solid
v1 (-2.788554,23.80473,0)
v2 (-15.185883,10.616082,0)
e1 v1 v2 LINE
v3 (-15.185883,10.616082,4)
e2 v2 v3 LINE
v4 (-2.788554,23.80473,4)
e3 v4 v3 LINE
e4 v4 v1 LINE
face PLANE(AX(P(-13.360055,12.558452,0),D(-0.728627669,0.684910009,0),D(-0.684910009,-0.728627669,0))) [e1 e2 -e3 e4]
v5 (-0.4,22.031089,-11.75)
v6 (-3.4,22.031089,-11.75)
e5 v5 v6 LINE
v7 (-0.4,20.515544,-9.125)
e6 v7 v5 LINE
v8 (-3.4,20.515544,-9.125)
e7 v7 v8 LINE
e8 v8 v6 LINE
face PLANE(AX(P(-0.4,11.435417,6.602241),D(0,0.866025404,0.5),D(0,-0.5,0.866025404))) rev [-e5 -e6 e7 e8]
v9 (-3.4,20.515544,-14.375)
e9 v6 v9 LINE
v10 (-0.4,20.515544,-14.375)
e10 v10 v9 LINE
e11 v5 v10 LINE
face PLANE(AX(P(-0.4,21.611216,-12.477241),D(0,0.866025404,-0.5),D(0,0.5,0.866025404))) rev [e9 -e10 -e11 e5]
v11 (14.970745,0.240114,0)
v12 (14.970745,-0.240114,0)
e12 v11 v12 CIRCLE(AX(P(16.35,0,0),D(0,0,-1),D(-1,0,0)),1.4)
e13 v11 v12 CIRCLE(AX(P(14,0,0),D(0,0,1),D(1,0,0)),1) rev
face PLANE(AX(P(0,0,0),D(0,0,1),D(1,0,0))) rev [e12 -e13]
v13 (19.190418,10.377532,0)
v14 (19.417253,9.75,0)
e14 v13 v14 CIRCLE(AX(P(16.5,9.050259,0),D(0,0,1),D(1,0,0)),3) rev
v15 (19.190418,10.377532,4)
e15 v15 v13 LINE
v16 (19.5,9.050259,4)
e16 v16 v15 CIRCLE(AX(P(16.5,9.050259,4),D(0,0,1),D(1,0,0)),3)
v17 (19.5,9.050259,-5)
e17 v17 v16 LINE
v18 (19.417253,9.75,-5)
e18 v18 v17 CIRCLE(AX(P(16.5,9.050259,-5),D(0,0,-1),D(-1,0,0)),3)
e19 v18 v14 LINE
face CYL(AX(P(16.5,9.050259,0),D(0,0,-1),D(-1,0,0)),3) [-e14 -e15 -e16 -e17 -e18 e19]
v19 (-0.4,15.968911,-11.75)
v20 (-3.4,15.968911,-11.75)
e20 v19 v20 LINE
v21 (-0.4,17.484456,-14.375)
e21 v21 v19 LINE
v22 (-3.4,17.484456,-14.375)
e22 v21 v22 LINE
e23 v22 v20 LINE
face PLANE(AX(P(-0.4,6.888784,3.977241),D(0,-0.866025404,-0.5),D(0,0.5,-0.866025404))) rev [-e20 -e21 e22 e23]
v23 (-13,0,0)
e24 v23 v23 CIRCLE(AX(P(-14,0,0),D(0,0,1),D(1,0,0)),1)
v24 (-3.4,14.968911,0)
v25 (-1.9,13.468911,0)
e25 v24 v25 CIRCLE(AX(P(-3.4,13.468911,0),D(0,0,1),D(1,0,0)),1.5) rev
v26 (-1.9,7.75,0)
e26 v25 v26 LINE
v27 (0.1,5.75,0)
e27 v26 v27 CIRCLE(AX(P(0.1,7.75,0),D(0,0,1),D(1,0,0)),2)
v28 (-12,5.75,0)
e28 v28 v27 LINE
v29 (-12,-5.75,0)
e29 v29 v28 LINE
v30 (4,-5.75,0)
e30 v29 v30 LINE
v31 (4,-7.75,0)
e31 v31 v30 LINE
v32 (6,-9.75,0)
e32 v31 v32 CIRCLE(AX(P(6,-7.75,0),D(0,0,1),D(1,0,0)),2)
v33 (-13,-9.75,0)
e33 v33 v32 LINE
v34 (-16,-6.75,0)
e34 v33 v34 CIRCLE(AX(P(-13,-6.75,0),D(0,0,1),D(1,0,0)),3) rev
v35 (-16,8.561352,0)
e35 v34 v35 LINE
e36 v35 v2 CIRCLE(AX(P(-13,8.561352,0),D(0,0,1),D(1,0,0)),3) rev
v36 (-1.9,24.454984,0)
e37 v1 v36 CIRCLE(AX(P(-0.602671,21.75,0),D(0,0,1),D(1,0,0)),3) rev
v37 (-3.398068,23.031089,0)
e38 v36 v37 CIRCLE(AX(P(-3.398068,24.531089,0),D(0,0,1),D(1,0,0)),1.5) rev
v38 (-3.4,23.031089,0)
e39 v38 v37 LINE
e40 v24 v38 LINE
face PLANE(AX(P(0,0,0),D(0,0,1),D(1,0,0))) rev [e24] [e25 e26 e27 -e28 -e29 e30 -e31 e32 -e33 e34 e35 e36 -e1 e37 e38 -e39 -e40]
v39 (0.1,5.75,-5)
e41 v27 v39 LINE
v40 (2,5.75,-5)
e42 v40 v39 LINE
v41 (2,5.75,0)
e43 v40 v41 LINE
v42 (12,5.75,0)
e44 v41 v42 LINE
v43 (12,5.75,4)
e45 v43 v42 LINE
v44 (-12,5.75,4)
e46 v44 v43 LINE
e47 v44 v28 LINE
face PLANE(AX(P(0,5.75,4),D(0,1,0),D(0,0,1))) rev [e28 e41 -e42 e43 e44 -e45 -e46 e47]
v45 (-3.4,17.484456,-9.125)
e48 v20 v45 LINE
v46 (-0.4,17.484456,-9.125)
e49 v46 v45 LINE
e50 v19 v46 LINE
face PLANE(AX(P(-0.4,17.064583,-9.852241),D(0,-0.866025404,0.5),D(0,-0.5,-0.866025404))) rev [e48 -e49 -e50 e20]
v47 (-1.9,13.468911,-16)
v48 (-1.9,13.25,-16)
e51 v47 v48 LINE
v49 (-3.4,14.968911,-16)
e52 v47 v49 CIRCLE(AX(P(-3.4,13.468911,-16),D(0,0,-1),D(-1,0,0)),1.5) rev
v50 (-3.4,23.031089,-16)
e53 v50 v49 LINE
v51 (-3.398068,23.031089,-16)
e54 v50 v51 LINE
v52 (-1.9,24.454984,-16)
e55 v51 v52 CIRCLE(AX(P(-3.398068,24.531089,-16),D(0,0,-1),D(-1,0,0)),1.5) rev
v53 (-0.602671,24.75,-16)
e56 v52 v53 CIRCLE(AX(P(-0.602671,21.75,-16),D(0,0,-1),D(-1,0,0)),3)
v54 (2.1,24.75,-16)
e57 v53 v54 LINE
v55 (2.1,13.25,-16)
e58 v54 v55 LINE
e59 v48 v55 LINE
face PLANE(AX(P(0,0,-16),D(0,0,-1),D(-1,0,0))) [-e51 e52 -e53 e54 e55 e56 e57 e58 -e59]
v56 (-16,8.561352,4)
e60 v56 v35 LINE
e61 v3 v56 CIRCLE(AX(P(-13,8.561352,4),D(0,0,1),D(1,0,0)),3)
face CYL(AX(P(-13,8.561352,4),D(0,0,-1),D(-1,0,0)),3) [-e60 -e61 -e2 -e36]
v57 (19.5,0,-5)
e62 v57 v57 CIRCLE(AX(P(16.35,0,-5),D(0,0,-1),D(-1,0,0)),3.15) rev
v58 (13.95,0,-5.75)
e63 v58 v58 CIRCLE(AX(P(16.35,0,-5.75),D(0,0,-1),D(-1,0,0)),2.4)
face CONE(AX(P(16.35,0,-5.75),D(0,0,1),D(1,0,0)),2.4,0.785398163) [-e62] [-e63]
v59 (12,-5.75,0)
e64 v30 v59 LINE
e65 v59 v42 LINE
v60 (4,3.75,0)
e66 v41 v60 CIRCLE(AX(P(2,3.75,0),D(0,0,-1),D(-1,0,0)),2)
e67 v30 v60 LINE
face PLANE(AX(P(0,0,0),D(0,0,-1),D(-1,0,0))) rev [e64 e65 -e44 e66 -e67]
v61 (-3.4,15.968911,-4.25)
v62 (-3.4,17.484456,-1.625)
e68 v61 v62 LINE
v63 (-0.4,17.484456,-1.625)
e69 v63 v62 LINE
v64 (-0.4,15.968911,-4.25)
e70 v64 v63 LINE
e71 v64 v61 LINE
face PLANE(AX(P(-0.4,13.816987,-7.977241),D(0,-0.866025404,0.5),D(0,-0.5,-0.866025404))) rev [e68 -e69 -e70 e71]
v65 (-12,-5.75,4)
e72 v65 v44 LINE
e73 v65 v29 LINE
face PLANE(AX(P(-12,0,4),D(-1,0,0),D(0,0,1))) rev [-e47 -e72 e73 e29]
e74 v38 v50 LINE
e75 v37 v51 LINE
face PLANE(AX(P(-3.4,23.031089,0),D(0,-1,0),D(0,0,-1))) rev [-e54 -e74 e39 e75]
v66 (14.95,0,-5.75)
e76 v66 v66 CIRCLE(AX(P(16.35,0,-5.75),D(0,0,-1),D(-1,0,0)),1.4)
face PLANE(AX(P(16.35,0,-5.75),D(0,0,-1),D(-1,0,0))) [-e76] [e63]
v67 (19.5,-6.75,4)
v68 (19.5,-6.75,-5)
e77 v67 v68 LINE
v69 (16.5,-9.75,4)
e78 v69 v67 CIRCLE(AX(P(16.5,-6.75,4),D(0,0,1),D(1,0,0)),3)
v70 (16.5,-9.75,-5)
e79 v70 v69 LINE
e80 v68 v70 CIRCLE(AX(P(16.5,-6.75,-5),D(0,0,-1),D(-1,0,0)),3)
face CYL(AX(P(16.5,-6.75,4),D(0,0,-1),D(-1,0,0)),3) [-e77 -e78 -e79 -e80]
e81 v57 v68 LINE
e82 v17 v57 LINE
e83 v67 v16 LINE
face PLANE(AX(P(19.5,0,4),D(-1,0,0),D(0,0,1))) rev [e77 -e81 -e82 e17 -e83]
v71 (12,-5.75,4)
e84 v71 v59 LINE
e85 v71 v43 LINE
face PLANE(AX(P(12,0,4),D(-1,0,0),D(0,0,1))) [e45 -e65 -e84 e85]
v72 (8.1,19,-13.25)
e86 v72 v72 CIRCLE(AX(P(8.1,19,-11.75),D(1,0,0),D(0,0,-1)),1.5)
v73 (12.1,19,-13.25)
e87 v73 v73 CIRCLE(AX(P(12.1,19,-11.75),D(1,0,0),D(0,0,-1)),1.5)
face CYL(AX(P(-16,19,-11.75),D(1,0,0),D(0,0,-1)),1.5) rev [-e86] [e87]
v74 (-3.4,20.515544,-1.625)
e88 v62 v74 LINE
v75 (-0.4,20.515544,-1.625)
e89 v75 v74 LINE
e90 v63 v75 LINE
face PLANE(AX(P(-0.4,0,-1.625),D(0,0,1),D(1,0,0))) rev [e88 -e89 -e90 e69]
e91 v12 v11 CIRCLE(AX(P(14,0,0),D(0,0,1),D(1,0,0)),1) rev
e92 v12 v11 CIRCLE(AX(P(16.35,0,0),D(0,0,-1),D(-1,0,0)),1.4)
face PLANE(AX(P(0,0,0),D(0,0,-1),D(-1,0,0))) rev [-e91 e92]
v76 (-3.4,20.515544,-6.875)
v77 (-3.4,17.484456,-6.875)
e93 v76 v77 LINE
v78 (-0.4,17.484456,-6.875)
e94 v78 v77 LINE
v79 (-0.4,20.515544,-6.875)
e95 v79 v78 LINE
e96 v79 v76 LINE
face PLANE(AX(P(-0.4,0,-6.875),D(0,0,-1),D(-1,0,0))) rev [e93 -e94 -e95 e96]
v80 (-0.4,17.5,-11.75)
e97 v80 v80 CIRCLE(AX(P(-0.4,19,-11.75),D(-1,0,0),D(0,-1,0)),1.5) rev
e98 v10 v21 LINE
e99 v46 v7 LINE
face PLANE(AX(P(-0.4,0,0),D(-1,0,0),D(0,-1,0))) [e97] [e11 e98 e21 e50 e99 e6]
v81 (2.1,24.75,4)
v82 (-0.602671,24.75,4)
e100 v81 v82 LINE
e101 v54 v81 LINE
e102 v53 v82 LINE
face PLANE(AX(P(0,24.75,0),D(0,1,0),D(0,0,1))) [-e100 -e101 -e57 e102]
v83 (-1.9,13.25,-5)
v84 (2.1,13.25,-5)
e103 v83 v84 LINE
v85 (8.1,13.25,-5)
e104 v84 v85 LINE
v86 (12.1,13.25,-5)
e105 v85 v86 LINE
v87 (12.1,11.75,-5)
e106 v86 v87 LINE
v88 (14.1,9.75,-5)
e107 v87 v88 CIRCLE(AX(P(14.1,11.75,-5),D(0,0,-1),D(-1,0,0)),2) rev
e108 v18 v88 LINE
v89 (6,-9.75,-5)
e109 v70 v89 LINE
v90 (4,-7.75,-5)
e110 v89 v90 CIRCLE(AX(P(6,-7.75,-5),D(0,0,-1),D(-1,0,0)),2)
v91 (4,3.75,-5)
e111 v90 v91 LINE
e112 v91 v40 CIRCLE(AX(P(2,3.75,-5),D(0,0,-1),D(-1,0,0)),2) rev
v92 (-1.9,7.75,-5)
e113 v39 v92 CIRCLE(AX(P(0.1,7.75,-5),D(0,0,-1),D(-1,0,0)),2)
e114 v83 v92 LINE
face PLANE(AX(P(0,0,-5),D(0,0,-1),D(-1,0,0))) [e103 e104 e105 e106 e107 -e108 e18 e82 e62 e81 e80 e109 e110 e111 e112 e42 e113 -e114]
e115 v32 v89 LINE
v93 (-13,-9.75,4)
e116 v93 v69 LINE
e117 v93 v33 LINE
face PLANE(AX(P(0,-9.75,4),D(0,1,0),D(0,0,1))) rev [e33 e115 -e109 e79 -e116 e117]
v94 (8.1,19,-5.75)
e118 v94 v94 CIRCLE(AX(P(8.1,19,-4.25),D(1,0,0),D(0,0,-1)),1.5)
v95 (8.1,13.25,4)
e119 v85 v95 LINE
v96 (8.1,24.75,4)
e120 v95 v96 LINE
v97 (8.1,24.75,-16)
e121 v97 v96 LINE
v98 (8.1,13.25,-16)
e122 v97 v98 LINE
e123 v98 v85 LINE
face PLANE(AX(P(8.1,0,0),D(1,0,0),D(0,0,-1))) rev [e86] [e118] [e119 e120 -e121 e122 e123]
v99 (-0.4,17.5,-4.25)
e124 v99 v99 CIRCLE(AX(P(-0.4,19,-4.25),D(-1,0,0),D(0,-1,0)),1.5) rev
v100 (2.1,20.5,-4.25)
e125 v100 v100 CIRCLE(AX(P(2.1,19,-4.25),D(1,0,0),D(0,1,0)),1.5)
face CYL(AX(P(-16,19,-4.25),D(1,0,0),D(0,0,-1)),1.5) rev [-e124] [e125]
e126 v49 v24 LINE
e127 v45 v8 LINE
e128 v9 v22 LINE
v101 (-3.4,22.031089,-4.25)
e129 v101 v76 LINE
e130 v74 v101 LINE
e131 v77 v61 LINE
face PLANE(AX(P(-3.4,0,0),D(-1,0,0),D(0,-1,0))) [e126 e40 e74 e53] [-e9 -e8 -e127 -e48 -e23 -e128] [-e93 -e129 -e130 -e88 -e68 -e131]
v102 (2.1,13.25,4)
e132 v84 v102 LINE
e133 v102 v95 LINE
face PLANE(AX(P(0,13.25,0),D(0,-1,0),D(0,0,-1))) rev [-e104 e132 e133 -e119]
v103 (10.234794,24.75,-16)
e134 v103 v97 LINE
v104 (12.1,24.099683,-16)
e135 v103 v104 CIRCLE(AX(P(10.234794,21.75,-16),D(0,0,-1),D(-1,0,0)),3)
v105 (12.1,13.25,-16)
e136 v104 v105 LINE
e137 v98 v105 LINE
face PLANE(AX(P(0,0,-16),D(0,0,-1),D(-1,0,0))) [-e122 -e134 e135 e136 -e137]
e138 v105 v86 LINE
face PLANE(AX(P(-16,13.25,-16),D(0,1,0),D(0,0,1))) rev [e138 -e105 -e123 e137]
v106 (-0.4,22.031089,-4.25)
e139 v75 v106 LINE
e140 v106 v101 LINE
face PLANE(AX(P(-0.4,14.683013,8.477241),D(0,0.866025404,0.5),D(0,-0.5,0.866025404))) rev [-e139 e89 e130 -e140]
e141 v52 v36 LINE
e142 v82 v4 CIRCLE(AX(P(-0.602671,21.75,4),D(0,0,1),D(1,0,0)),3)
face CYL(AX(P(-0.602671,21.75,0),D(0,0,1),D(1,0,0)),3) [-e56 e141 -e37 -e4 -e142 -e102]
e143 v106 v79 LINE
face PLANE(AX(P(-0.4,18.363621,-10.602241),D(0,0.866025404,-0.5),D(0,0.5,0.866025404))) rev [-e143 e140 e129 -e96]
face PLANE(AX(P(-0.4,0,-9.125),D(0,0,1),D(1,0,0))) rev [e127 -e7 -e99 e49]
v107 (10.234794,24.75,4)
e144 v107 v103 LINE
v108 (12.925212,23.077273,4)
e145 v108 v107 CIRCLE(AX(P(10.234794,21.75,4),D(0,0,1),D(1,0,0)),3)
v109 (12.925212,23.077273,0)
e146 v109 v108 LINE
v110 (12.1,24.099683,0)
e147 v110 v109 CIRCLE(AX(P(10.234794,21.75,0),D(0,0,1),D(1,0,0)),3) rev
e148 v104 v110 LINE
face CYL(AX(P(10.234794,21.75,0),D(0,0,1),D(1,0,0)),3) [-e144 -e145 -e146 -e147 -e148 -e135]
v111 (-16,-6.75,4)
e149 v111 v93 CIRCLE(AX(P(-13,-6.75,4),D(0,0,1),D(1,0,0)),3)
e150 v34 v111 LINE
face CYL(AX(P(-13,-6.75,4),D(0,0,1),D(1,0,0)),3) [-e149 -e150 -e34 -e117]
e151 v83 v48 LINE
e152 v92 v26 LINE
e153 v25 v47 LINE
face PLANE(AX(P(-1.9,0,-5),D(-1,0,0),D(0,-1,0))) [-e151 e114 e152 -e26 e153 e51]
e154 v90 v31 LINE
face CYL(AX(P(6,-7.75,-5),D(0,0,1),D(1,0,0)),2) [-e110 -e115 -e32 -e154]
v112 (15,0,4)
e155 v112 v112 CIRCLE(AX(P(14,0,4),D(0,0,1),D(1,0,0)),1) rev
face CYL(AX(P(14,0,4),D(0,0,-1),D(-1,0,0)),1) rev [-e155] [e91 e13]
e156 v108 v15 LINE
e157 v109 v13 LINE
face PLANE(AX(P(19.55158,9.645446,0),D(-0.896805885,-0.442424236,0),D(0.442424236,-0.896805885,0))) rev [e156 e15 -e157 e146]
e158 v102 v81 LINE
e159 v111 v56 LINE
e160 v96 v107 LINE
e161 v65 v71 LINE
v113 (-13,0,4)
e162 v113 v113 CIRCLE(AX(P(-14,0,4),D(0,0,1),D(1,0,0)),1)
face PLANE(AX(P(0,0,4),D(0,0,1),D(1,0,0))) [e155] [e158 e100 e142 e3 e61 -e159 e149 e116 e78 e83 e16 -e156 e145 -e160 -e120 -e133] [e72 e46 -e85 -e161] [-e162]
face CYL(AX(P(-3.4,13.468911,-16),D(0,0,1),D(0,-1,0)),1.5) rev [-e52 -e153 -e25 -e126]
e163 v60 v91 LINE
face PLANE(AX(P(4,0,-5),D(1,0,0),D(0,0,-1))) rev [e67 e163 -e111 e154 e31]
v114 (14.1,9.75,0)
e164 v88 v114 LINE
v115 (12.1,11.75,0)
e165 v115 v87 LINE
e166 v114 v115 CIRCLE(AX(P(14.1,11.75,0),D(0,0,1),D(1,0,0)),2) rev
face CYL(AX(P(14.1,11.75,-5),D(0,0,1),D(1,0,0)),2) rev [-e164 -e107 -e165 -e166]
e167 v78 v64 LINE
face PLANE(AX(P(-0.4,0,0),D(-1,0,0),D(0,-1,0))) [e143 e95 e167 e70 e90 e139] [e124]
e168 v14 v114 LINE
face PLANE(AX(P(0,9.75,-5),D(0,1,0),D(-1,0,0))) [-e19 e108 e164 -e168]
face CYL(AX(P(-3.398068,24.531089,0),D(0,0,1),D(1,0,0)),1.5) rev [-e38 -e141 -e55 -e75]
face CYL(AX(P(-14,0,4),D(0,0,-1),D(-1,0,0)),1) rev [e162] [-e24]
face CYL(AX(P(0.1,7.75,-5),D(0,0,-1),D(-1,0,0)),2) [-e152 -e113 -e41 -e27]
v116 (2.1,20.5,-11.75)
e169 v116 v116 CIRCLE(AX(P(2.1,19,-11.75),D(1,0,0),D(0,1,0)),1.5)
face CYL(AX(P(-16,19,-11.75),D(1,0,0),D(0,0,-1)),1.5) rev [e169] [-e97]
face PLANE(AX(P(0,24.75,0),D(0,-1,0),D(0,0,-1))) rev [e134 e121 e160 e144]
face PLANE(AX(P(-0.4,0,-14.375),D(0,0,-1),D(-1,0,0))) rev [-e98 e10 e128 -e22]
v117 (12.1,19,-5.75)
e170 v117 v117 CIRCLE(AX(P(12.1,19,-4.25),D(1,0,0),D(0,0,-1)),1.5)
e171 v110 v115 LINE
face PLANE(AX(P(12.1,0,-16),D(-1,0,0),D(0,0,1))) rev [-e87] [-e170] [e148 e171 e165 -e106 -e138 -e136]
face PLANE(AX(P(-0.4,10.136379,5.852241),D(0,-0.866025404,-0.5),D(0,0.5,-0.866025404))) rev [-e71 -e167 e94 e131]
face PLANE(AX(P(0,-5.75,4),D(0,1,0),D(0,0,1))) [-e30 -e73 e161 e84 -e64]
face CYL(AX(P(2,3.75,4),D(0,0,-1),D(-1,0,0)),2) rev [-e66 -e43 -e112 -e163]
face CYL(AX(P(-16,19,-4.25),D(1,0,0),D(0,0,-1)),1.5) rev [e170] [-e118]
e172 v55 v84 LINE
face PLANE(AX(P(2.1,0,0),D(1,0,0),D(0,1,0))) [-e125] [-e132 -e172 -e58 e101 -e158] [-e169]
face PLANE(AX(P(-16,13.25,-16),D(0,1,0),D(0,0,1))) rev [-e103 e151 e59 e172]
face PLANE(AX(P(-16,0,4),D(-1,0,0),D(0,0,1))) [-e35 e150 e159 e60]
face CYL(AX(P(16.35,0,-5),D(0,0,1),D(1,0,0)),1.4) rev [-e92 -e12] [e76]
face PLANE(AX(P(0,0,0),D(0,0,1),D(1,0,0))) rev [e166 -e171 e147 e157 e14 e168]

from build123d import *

# Parameters (mm, degrees)
SKETCH_1_W          = 32
SKETCH_1_H          = 19.5
SKETCH_1_R          = 1
SKETCH_1_W_2        = 24
SKETCH_1_H_2        = 11.5
SKETCH_1_W_3        = 3.5
EXTRUDE_1_DEPTH     = 4
SKETCH_4_W          = 3
SKETCH_4_H          = 3.5
EXTRUDE_3_DEPTH     = 4
FILLET_2_R          = 3
SKETCH_9_R          = 1.4
EXTRUDE_5_DEPTH     = 5
EXTRUDE_START       = 16
EXTRUDE_6_DEPTH     = 16
SKETCH_12_R         = 2.4
SKETCH_12_R_2       = 1.4
EXTRUDE_7_DEPTH     = 0.75
CHAMFER_4_SIZE      = 0.75
SKETCH_11_R         = 1.5
SKETCH_11_W         = 11
SKETCH_11_H         = 3.5
CUT_EXTRUDE_2_DEPTH = 41.720664287
FILLET_7_R          = 2
CUT_EXTRUDE_START   = -1.5
SKETCH_13_R         = 1.5
CUT_EXTRUDE_4_DEPTH = 1.5
SKETCH_15_W         = 16
SKETCH_15_H         = 8.062177826
EXTRUDE_9_DEPTH     = 1.5
FILLET_8_R          = 1.5


# Some blends are built 0.0001 mm under size
with BuildPart() as part:
    # Эскиз1 → Бобышка-Вытянуть1 (new body)
    # profile 1 of 2: a face of its own
    with BuildSketch(Plane.XY):
        Rectangle(SKETCH_1_W, SKETCH_1_H)
        with Locations((-14, 0)):
            Circle(SKETCH_1_R, mode=Mode.SUBTRACT)
        with Locations((14, 0)):
            Circle(SKETCH_1_R, mode=Mode.SUBTRACT)
        Rectangle(SKETCH_1_W_2, SKETCH_1_H_2, mode=Mode.SUBTRACT)
    # profile 2 of 2: a face of its own
    with BuildSketch(Plane.XY):
        with Locations((17.75, 0)):
            Rectangle(SKETCH_1_W_3, SKETCH_1_H)
    extrude(amount=EXTRUDE_1_DEPTH)

    # Эскиз4 → Бобышка-Вытянуть3 (add)
    with BuildSketch(Plane.XY.offset(4)):
        Polygon((-16, 9.75), (-1.9, 9.75), (-1.9, 24.75), align=None)
        Polygon((-1.9, 9.75), (2.1, 9.75), (2.1, 13.25), (2.1, 24.75), (-1.9, 24.75), align=None)
        Polygon((8.1, 13.25), (8.1, 9.75), (12.1, 9.75), (12.1, 24.75), (8.1, 24.75), align=None)
        Polygon((12.1, 24.75), (12.1, 9.75), (19.5, 9.75), align=None)
        with Locations((3.6, 11.5)):
            Rectangle(SKETCH_4_W, SKETCH_4_H)
        with Locations((6.6, 11.5)):
            Rectangle(SKETCH_4_W, SKETCH_4_H)
    extrude(amount=-EXTRUDE_3_DEPTH)

    # Скругление2
    fillet_2_edges = [part.edges().sort_by_distance(p)[0] for p in [
        (-16, 9.75, 2),
        (19.5, 9.75, 2),
        (19.5, -9.75, 2),
        (-16, -9.75, 2),
        (-1.9, 24.75, 2),
        (12.1, 24.75, 2),
    ]]
    fillet(fillet_2_edges, radius=FILLET_2_R)

    # Эскиз9 → Бобышка-Вытянуть5 (add)
    with BuildSketch(Plane(origin=(0, 0, 0), x_dir=(-1, 0, 0), z_dir=(0, 0, -1))):
        with BuildLine():
            ThreePointArc((-19.5, -6.75), (-18.621320344, -8.871320344), (-16.5, -9.75))
            Line((-16.5, -9.75), (-4, -9.75))
            Line((-4, -9.75), (-4, 5.75))
            Line((-4, 5.75), (1.9, 5.75))
            Line((1.9, 5.75), (1.9, 9.75))
            Line((1.9, 9.75), (-19.417252583, 9.75))
            ThreePointArc((-19.417252583, 9.75), (-19.479241325, 9.402567354), (-19.5, 9.050259072))
            Line((-19.5, 9.050259072), (-19.5, -6.75))
        make_face()
        with Locations(Location((-16.35, 0, 0), (0, 0, 9.875627991))):
            Circle(SKETCH_9_R, mode=Mode.SUBTRACT)
    extrude(amount=EXTRUDE_5_DEPTH)

    # Эскиз10 → Бобышка-Вытянуть6 (add)
    with BuildSketch(Plane(origin=(0, 0, 0), x_dir=(-1, 0, 0), z_dir=(0, 0, -1)).offset(EXTRUDE_START)):
        with BuildLine():
            Line((-8.1, 24.75), (-10.234794476, 24.75))
            ThreePointArc((-10.234794476, 24.75), (-11.222456407, 24.582759063), (-12.1, 24.099682607))
            Line((-12.1, 24.099682607), (-12.1, 9.75))
            Line((-12.1, 9.75), (1.9, 9.75))
            Line((1.9, 9.75), (1.9, 24.454983709))
            ThreePointArc((1.9, 24.454983709), (1.267895871, 24.675316319), (0.602670769, 24.75))
            Line((0.602670769, 24.75), (-2.1, 24.75))
            Line((-2.1, 24.75), (-2.1, 13.25))
            Line((-2.1, 13.25), (-8.1, 13.25))
            Line((-8.1, 13.25), (-8.1, 24.75))
        make_face()
    extrude(amount=-EXTRUDE_6_DEPTH)

    # Эскиз12 → Бобышка-Вытянуть7 (add)
    with BuildSketch(Plane(origin=(0, 0, -5), x_dir=(-1, 0, 0), z_dir=(0, 0, -1))):
        with Locations((-16.35, 0)):
            Circle(SKETCH_12_R)
        with Locations(Location((-16.35, 0, 0), (0, 0, 9.875627991))):
            Circle(SKETCH_12_R_2, mode=Mode.SUBTRACT)
    extrude(amount=EXTRUDE_7_DEPTH)

    # Фаска4
    chamfer_4_edges = [part.edges().sort_by_distance(p)[0] for p in [
        (18.75, 0, -5),
    ]]
    chamfer(chamfer_4_edges, length=CHAMFER_4_SIZE - 0.0001)  # a hair under: the kernel refuses the full size

    # Эскиз11 → Вырез-Вытянуть2 (cut, through all)
    with BuildSketch(Plane(origin=(12.1, 0, 0), x_dir=(0, 0, -1), z_dir=(1, 0, 0))):
        with Locations((4.25, 19)):
            Circle(SKETCH_11_R)
        with Locations((11.75, 19)):
            Circle(SKETCH_11_R)
        with Locations((10.5, 11.5)):
            Rectangle(SKETCH_11_W, SKETCH_11_H)
    extrude(amount=-CUT_EXTRUDE_2_DEPTH, mode=Mode.SUBTRACT)

    # Скругление7
    fillet_7_edges = [part.edges().sort_by_distance(p)[0] for p in [
        (4, -9.75, -2.5),
        (4, 5.75, -2.5),
        (-1.9, 5.75, -2.5),
        (12.1, 9.75, -2.5),
    ]]
    fillet(fillet_7_edges, radius=FILLET_7_R)

    # Эскиз13 → Вырез-Вытянуть4 (cut)
    # profile 1 of 2: a face of its own
    with BuildSketch(Plane.ZY.offset(1.9).offset(CUT_EXTRUDE_START)):
        Polygon((-11.75, 15.968911087), (-9.125, 17.484455543), (-9.125, 20.515544457), (-11.75, 22.031088913), (-14.375, 20.515544457), (-14.375, 17.484455543), align=None)
        with Locations(Location((-11.75, 19, 0), (0, 0, 90))):
            Circle(SKETCH_13_R, mode=Mode.SUBTRACT)
    # profile 2 of 2: a face of its own
    with BuildSketch(Plane.ZY.offset(1.9).offset(CUT_EXTRUDE_START)):
        Polygon((-1.625, 17.484455543), (-1.625, 20.515544457), (-4.25, 22.031088913), (-6.875, 20.515544457), (-6.875, 17.484455543), (-4.25, 15.968911087), align=None)
        with Locations(Location((-4.25, 19, 0), (0, 0, 90))):
            Circle(SKETCH_13_R, mode=Mode.SUBTRACT)
    extrude(amount=CUT_EXTRUDE_4_DEPTH, mode=Mode.SUBTRACT)

    # Эскиз15 → Бобышка-Вытянуть9 (add)
    with BuildSketch(Plane.ZY.offset(1.9)):
        with Locations((-8, 19)):
            Rectangle(SKETCH_15_W, SKETCH_15_H)
        Polygon((-9.125, 20.515544457), (-11.75, 22.031088913), (-14.375, 20.515544457), (-14.375, 17.484455543), (-11.75, 15.968911087), (-9.125, 17.484455543), align=None, mode=Mode.SUBTRACT)
        Polygon((-1.625, 17.484455543), (-1.625, 20.515544457), (-4.25, 22.031088913), (-6.875, 20.515544457), (-6.875, 17.484455543), (-4.25, 15.968911087), align=None, mode=Mode.SUBTRACT)
    extrude(amount=EXTRUDE_9_DEPTH)

    # Скругление8
    # the kernel refuses this fillet: 1.5 mm, written as the material it adds along each edge
    with BuildSketch(Plane(origin=(-1.9, 14.968911087, -16), x_dir=(-1, 0, 0), z_dir=(0, 0, 1))) as fillet_8_piece_1:
        with BuildLine():
            CenterArc((FILLET_8_R, FILLET_8_R), FILLET_8_R, 180, 90)
            Line((0, FILLET_8_R), (-FILLET_8_R * 0.02, FILLET_8_R))
            Line((-FILLET_8_R * 0.02, FILLET_8_R), (-FILLET_8_R * 0.02, -FILLET_8_R * 0.02))
            Line((-FILLET_8_R * 0.02, -FILLET_8_R * 0.02), (FILLET_8_R, -FILLET_8_R * 0.02))
            Line((FILLET_8_R, -FILLET_8_R * 0.02), (FILLET_8_R, 0))
        make_face()
    extrude(amount=19.75)
    with BuildSketch(Plane(origin=(-1.9, 23.031088913, 3.745170221), x_dir=(0, 1, 0), z_dir=(0, 0, -1))) as fillet_8_piece_2:
        with BuildLine():
            CenterArc((1.5, -1.498068089), FILLET_8_R, 92.908253333, 87.091746667)
            Line((0, -1.498068089), (-0.03, -1.498068089))
            Line((-0.03, -1.498068089), (-0.03, 0))
            Line((-0.03, 0), (0, 0.03))
            ThreePointArc((0, 0.03), (0.711947398, 0.03), (1.422372692, 0.029961362))
            Line((1.422372692, 0.029961362), (1.423894796, 0))
        make_face()
    extrude(amount=19.745170221)


solid = part.part
